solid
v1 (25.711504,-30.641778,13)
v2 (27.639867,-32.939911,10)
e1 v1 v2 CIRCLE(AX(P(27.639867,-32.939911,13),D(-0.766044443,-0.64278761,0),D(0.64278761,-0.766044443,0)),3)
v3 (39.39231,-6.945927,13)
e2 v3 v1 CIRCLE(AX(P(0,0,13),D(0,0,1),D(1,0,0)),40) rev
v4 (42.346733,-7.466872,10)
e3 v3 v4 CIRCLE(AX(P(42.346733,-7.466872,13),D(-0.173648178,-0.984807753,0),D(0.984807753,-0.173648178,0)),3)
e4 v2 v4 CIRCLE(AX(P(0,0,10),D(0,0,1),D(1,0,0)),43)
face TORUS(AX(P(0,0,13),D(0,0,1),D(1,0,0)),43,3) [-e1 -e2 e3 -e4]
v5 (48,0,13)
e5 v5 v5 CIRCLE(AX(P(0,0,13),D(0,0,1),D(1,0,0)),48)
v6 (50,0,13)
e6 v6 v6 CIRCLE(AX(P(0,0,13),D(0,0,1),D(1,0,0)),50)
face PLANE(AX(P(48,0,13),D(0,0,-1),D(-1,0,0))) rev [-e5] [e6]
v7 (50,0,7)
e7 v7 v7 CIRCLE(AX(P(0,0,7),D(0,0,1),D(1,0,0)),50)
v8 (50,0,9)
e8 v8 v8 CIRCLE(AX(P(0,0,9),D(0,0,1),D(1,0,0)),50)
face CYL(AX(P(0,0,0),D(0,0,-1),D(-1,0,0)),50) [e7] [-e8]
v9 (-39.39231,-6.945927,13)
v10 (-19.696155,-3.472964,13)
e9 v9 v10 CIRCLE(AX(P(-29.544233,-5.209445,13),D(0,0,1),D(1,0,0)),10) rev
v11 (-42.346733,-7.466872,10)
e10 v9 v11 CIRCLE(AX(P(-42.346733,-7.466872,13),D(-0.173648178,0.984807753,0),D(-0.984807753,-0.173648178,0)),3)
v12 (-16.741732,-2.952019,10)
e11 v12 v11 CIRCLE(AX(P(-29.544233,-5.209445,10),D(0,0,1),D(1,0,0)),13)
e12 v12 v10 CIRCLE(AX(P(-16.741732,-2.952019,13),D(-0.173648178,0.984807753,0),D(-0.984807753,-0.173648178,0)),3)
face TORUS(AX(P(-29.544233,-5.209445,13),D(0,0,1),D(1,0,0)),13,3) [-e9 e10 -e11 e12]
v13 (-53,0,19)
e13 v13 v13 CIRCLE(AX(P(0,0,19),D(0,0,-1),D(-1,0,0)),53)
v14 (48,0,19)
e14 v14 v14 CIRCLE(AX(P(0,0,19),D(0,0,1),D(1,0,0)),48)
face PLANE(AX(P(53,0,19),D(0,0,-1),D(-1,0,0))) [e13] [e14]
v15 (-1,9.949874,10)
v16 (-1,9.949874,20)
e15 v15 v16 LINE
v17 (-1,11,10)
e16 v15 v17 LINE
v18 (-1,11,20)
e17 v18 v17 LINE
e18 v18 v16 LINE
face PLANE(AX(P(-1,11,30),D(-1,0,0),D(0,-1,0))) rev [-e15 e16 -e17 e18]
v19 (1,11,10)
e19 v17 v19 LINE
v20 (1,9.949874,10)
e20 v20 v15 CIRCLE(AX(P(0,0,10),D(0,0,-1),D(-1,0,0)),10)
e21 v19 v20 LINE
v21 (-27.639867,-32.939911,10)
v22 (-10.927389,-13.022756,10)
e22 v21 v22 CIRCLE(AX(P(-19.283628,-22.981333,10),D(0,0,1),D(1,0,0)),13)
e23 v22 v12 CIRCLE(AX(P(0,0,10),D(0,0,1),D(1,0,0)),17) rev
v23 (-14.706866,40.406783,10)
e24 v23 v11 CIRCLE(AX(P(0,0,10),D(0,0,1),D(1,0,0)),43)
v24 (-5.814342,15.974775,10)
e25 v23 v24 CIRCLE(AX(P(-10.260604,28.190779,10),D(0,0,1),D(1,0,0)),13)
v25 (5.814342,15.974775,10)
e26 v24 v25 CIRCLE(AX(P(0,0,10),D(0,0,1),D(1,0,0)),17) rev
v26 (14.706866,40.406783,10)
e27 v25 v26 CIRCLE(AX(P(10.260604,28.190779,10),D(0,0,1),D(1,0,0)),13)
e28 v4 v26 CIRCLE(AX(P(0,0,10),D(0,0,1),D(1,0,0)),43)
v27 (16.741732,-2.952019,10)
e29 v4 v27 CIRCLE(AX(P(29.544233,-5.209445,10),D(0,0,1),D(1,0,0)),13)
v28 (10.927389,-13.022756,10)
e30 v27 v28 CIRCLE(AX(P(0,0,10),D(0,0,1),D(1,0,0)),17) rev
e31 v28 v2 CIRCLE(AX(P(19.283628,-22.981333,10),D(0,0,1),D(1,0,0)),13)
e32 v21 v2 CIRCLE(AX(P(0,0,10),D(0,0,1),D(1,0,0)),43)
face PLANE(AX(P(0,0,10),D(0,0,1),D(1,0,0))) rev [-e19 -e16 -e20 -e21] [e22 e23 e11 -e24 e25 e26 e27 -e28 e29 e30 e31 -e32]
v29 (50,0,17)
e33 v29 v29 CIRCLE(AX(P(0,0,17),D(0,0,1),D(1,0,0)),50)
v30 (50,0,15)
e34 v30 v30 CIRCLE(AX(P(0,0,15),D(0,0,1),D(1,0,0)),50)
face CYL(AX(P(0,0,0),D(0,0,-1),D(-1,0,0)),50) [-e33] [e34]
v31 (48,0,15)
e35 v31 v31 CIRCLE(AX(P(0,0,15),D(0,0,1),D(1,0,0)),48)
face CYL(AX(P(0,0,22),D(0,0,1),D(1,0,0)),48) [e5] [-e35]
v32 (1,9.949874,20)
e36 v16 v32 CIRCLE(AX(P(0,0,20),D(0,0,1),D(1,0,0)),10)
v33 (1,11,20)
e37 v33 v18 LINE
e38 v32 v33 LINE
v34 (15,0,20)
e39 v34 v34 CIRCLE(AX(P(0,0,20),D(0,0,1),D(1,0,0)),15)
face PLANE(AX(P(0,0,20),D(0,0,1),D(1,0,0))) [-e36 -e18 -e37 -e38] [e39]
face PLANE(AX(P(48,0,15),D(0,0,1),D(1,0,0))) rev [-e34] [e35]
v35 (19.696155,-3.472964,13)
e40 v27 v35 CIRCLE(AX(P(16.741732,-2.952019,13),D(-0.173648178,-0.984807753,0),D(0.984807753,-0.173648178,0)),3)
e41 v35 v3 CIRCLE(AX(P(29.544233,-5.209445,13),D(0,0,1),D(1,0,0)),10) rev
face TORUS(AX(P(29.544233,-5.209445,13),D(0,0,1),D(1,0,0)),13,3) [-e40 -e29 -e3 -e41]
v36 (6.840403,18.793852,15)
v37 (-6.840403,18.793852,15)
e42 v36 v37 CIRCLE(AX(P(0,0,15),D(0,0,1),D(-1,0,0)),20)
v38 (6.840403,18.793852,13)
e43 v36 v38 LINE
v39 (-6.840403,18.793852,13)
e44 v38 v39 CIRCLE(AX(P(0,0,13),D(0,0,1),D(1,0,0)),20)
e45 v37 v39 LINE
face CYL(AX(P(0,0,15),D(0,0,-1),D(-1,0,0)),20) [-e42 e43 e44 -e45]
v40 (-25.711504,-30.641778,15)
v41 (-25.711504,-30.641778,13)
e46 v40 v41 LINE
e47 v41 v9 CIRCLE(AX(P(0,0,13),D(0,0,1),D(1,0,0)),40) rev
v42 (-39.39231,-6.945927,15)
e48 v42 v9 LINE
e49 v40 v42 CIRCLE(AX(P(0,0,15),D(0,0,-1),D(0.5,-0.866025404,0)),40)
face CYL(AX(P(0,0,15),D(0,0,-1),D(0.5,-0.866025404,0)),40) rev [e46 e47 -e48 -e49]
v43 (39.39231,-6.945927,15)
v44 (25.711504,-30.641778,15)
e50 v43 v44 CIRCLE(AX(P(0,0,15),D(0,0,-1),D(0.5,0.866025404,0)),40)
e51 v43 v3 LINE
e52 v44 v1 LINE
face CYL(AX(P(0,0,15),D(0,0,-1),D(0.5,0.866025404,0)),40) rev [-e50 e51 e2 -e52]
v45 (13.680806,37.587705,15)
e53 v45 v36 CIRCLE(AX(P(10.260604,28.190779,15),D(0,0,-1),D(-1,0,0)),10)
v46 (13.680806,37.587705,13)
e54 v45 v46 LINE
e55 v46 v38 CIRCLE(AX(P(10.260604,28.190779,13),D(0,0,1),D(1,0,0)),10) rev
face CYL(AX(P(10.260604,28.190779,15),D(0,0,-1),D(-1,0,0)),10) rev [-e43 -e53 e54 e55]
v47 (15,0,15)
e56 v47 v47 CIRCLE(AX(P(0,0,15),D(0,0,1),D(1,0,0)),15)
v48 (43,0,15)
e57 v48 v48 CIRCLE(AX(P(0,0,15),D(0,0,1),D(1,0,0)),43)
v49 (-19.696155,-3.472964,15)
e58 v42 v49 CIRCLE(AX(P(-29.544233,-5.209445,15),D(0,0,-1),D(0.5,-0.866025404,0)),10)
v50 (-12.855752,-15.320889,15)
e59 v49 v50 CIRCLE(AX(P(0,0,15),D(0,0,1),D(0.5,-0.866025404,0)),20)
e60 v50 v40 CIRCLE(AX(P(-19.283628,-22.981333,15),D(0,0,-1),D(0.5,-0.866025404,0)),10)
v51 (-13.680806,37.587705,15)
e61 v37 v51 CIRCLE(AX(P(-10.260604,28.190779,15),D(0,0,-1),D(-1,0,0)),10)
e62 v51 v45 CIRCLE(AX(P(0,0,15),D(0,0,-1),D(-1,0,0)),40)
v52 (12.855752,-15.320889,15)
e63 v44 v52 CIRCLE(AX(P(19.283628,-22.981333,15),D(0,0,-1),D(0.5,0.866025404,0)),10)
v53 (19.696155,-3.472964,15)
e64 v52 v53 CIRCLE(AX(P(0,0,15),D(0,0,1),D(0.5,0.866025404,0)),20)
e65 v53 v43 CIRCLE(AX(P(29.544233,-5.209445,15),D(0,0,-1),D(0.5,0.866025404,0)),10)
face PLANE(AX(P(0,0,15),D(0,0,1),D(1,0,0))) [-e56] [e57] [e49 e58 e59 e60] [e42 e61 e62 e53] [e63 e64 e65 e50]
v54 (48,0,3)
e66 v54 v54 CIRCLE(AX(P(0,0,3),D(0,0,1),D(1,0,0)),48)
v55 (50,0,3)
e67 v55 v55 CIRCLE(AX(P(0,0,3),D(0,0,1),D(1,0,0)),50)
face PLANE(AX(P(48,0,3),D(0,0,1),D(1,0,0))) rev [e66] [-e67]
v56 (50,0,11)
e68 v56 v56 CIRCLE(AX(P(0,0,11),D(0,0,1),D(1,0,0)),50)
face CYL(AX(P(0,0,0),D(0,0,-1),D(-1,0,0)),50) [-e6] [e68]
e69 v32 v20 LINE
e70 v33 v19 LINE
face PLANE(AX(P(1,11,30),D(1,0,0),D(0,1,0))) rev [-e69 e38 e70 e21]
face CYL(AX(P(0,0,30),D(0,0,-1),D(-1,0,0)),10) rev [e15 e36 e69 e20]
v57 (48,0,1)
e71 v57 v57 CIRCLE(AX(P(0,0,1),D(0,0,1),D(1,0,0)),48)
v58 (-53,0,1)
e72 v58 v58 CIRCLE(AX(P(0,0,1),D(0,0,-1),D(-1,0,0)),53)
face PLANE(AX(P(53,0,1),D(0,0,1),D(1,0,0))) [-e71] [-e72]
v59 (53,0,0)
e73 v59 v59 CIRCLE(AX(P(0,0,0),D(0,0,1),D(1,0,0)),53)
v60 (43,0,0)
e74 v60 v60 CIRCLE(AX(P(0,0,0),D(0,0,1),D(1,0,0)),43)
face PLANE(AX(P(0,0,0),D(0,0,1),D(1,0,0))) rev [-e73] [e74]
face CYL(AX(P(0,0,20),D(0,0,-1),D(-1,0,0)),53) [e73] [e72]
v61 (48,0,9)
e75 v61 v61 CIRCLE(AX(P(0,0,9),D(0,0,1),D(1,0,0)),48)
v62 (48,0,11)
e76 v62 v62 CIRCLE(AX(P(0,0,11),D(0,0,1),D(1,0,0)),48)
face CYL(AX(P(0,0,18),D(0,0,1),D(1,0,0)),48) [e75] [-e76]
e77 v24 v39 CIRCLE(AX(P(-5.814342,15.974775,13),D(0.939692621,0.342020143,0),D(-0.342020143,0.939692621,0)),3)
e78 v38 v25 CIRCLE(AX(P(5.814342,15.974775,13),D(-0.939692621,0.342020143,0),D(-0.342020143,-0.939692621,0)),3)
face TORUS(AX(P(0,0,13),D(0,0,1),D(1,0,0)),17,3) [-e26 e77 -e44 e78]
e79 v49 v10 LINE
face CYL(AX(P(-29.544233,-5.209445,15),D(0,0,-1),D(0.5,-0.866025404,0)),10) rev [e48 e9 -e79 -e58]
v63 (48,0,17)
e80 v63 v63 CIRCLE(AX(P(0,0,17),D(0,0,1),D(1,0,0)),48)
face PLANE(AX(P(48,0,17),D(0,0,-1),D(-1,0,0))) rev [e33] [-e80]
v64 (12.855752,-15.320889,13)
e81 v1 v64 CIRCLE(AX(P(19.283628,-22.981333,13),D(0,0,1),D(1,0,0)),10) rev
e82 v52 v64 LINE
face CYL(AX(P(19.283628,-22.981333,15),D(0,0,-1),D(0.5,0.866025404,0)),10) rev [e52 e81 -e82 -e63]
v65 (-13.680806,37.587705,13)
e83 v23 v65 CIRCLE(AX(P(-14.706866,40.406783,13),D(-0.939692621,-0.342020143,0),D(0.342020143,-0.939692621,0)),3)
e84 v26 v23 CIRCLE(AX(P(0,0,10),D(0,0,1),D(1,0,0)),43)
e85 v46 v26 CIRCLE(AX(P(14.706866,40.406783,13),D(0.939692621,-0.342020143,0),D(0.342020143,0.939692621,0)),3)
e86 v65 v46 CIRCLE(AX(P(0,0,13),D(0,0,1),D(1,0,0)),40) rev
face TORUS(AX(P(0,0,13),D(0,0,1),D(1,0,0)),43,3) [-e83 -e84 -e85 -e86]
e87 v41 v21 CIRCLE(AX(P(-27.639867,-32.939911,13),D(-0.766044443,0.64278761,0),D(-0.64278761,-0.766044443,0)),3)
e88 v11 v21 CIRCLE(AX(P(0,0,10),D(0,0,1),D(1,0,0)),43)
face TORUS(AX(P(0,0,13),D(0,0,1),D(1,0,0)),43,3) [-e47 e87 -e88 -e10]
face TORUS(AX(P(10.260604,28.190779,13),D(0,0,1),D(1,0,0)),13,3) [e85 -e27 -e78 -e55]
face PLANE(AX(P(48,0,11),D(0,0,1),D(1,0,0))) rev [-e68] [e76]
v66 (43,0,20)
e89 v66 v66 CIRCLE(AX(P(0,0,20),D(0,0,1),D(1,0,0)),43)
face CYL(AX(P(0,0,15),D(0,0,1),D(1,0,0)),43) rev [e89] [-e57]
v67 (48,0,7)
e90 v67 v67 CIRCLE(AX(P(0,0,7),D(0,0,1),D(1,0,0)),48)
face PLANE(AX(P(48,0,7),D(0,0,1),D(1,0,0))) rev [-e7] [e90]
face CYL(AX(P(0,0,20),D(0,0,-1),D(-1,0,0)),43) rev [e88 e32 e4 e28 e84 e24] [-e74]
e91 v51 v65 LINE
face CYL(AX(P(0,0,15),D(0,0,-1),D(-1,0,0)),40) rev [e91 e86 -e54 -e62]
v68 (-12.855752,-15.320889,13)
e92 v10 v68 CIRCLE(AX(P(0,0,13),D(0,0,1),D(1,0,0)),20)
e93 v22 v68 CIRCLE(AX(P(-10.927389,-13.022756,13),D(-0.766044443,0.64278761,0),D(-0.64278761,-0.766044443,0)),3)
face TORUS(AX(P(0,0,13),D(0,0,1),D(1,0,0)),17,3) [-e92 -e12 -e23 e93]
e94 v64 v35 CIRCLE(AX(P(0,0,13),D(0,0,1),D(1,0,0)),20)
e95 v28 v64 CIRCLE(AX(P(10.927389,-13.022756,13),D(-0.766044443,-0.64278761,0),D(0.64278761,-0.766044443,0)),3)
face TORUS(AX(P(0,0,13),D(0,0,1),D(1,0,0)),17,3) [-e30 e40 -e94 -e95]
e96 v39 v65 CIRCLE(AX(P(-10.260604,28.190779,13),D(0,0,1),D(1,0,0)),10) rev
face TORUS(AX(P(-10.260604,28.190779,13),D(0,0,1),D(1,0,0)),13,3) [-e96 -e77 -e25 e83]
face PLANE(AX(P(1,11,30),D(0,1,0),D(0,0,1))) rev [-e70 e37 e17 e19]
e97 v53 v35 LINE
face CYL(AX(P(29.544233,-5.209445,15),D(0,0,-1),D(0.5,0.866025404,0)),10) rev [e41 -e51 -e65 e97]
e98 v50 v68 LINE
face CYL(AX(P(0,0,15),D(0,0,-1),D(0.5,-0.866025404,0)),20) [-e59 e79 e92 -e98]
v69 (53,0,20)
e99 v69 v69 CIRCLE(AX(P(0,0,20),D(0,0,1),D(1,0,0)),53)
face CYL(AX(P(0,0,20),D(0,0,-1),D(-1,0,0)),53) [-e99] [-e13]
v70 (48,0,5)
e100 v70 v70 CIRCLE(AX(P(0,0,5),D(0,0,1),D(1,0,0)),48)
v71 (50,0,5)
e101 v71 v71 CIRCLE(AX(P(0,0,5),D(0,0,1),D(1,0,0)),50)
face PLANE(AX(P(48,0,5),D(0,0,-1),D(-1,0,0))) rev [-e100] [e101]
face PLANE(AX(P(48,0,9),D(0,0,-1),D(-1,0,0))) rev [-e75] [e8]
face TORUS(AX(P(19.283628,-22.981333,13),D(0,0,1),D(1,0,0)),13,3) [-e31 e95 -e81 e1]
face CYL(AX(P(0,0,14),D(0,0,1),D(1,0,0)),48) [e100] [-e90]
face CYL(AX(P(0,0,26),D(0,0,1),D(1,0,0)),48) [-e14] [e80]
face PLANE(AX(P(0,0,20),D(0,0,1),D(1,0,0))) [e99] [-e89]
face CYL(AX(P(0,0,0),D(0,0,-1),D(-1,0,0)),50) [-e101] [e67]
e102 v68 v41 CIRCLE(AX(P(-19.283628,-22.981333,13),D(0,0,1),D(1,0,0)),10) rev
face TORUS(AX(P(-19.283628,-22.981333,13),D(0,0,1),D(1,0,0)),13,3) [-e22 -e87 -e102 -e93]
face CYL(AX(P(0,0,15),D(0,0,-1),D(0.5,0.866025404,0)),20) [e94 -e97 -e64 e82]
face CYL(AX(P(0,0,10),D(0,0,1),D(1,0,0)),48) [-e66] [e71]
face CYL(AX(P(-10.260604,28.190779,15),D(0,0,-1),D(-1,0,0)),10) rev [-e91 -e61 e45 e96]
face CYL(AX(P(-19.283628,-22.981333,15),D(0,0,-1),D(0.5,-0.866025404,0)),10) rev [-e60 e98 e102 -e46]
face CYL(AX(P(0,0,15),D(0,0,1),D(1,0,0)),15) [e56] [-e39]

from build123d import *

# Parameters (mm, degrees)
SKETCH1_R           = 53
BOSS_EXTRUDE1_DEPTH = 20
SHELL1_T            = -10
SKETCH2_R           = 10
CUT_EXTRUDE1_DEPTH  = 20
SKETCH3_W           = 3
SKETCH3_H           = 18
SKETCH4_W           = 2
SKETCH4_H           = 2
LPATTERN1_COUNT     = 5
LPATTERN1_PITCH     = 4
SKETCH5_W           = 2
SKETCH5_H           = 3
CUT_EXTRUDE2_DEPTH  = 20
CUT_EXTRUDE3_START  = -5
SKETCH6_R           = 43
SKETCH6_R_2         = 15
CUT_EXTRUDE3_DEPTH  = 5
CUT_EXTRUDE4_DEPTH  = 5
CIRPATTERN1_COUNT   = 3
FILLET1_R           = 3


with BuildPart() as part:
    # Sketch1 → Boss-Extrude1 (new body)
    with BuildSketch(Plane.XY):
        Circle(SKETCH1_R)
    extrude(amount=BOSS_EXTRUDE1_DEPTH)

    # Shell1
    shell1_openings = [part.faces().sort_by_distance(p)[0] for p in [
        (0, 0, 0),
    ]]
    offset(amount=SHELL1_T, openings=shell1_openings, kind=Kind.INTERSECTION)

    # Sketch2 → Cut-Extrude1 (cut)
    with BuildSketch(Plane(origin=(0, 0, 10), x_dir=(-1, 0, 0), z_dir=(0, 0, -1))):
        Circle(SKETCH2_R)
    extrude(amount=-CUT_EXTRUDE1_DEPTH, mode=Mode.SUBTRACT)

    # Sketch3 → Cut-Revolve1 (revolve, cut)
    with BuildSketch(Plane(origin=(0, 0, 0), x_dir=(1, 0, 0), z_dir=(0, 1, 0)), mode=Mode.PRIVATE) as cut_revolve1_sk:
        with Locations((51.5, -10)):
            Rectangle(SKETCH3_W, SKETCH3_H)
    revolve(cut_revolve1_sk.sketch.rotate(Axis((0, 0, 0), (0, 0, 1)), 180), axis=Axis((0, 0, 0), (0, 0, 1)), mode=Mode.SUBTRACT)

    # Sketch4 → Cut-Revolve2 (revolve, cut)
    with BuildSketch(Plane(origin=(0, 0, 0), x_dir=(1, 0, 0), z_dir=(0, 1, 0)), mode=Mode.PRIVATE) as cut_revolve2_sk:
        with Locations((49, -2)):
            Rectangle(SKETCH4_W, SKETCH4_H)
    cut_revolve2 = revolve(cut_revolve2_sk.sketch.rotate(Axis((0, 0, 20), (0, 0, -1)), 180), axis=Axis((0, 0, 20), (0, 0, -1)), mode=Mode.SUBTRACT)

    # LPattern1: Cut-Revolve2 ×5
    with Locations(*[(0, 0, i * LPATTERN1_PITCH) for i in range(1, LPATTERN1_COUNT)]):
        add(cut_revolve2, mode=Mode.SUBTRACT)

    # Sketch5 → Cut-Extrude2 (cut)
    with BuildSketch(Plane(origin=(0, 0, 10), x_dir=(-1, 0, 0), z_dir=(0, 0, -1))):
        with Locations((0, 9.5)):
            Rectangle(SKETCH5_W, SKETCH5_H)
    extrude(amount=-CUT_EXTRUDE2_DEPTH, mode=Mode.SUBTRACT)

    # Sketch6 → Cut-Extrude3 (cut)
    with BuildSketch(Plane.XY.offset(20).offset(CUT_EXTRUDE3_START)):
        Circle(SKETCH6_R)
        Circle(SKETCH6_R_2, mode=Mode.SUBTRACT)
    extrude(amount=CUT_EXTRUDE3_DEPTH, mode=Mode.SUBTRACT)

    # Sketch7 → Cut-Extrude4 (cut)
    with BuildSketch(Plane(origin=(0, 0, 10), x_dir=(-1, 0, 0), z_dir=(0, 0, -1))):
        with BuildLine():
            ThreePointArc((13.680805733, 37.587704831), (0, 40), (-13.680805733, 37.587704831))
            ThreePointArc((-13.680805733, 37.587704831), (-19.657530508, 24.77057719), (-6.840402867, 18.793852416))
            ThreePointArc((-6.840402867, 18.793852416), (0, 20), (6.840402867, 18.793852416))
            ThreePointArc((6.840402867, 18.793852416), (19.657530508, 24.77057719), (13.680805733, 37.587704831))
        make_face()
    cut_extrude4 = extrude(amount=-CUT_EXTRUDE4_DEPTH, mode=Mode.SUBTRACT)

    # CirPattern1: Cut-Extrude4 ×3 about axis
    cirpattern1_axis = Axis((0, 0, 0), (0, 0, 1))
    for i in range(1, CIRPATTERN1_COUNT):
        add(cut_extrude4.rotate(cirpattern1_axis, i * 360 / CIRPATTERN1_COUNT), mode=Mode.SUBTRACT)

    # Fillet1
    fillet1_edges = [part.edges().sort_by_distance(p)[0] for p in [
        (-11.623183859, -29.40920939, 10),
        (-34.641016151, -20, 10),
        (-31.280714367, 4.6386322, 10),
        (-17.320508076, -10, 10),
        (-19.657530508, 24.77057719, 10),
        (0, 40, 10),
        (19.657530508, 24.77057719, 10),
        (0, 20, 10),
        (31.280714367, 4.6386322, 10),
        (34.641016151, -20, 10),
        (11.623183859, -29.40920939, 10),
        (17.320508076, -10, 10),
    ]]
    fillet(fillet1_edges, radius=FILLET1_R - 0.0001)  # a hair under: the kernel refuses the full size


solid = part.part
